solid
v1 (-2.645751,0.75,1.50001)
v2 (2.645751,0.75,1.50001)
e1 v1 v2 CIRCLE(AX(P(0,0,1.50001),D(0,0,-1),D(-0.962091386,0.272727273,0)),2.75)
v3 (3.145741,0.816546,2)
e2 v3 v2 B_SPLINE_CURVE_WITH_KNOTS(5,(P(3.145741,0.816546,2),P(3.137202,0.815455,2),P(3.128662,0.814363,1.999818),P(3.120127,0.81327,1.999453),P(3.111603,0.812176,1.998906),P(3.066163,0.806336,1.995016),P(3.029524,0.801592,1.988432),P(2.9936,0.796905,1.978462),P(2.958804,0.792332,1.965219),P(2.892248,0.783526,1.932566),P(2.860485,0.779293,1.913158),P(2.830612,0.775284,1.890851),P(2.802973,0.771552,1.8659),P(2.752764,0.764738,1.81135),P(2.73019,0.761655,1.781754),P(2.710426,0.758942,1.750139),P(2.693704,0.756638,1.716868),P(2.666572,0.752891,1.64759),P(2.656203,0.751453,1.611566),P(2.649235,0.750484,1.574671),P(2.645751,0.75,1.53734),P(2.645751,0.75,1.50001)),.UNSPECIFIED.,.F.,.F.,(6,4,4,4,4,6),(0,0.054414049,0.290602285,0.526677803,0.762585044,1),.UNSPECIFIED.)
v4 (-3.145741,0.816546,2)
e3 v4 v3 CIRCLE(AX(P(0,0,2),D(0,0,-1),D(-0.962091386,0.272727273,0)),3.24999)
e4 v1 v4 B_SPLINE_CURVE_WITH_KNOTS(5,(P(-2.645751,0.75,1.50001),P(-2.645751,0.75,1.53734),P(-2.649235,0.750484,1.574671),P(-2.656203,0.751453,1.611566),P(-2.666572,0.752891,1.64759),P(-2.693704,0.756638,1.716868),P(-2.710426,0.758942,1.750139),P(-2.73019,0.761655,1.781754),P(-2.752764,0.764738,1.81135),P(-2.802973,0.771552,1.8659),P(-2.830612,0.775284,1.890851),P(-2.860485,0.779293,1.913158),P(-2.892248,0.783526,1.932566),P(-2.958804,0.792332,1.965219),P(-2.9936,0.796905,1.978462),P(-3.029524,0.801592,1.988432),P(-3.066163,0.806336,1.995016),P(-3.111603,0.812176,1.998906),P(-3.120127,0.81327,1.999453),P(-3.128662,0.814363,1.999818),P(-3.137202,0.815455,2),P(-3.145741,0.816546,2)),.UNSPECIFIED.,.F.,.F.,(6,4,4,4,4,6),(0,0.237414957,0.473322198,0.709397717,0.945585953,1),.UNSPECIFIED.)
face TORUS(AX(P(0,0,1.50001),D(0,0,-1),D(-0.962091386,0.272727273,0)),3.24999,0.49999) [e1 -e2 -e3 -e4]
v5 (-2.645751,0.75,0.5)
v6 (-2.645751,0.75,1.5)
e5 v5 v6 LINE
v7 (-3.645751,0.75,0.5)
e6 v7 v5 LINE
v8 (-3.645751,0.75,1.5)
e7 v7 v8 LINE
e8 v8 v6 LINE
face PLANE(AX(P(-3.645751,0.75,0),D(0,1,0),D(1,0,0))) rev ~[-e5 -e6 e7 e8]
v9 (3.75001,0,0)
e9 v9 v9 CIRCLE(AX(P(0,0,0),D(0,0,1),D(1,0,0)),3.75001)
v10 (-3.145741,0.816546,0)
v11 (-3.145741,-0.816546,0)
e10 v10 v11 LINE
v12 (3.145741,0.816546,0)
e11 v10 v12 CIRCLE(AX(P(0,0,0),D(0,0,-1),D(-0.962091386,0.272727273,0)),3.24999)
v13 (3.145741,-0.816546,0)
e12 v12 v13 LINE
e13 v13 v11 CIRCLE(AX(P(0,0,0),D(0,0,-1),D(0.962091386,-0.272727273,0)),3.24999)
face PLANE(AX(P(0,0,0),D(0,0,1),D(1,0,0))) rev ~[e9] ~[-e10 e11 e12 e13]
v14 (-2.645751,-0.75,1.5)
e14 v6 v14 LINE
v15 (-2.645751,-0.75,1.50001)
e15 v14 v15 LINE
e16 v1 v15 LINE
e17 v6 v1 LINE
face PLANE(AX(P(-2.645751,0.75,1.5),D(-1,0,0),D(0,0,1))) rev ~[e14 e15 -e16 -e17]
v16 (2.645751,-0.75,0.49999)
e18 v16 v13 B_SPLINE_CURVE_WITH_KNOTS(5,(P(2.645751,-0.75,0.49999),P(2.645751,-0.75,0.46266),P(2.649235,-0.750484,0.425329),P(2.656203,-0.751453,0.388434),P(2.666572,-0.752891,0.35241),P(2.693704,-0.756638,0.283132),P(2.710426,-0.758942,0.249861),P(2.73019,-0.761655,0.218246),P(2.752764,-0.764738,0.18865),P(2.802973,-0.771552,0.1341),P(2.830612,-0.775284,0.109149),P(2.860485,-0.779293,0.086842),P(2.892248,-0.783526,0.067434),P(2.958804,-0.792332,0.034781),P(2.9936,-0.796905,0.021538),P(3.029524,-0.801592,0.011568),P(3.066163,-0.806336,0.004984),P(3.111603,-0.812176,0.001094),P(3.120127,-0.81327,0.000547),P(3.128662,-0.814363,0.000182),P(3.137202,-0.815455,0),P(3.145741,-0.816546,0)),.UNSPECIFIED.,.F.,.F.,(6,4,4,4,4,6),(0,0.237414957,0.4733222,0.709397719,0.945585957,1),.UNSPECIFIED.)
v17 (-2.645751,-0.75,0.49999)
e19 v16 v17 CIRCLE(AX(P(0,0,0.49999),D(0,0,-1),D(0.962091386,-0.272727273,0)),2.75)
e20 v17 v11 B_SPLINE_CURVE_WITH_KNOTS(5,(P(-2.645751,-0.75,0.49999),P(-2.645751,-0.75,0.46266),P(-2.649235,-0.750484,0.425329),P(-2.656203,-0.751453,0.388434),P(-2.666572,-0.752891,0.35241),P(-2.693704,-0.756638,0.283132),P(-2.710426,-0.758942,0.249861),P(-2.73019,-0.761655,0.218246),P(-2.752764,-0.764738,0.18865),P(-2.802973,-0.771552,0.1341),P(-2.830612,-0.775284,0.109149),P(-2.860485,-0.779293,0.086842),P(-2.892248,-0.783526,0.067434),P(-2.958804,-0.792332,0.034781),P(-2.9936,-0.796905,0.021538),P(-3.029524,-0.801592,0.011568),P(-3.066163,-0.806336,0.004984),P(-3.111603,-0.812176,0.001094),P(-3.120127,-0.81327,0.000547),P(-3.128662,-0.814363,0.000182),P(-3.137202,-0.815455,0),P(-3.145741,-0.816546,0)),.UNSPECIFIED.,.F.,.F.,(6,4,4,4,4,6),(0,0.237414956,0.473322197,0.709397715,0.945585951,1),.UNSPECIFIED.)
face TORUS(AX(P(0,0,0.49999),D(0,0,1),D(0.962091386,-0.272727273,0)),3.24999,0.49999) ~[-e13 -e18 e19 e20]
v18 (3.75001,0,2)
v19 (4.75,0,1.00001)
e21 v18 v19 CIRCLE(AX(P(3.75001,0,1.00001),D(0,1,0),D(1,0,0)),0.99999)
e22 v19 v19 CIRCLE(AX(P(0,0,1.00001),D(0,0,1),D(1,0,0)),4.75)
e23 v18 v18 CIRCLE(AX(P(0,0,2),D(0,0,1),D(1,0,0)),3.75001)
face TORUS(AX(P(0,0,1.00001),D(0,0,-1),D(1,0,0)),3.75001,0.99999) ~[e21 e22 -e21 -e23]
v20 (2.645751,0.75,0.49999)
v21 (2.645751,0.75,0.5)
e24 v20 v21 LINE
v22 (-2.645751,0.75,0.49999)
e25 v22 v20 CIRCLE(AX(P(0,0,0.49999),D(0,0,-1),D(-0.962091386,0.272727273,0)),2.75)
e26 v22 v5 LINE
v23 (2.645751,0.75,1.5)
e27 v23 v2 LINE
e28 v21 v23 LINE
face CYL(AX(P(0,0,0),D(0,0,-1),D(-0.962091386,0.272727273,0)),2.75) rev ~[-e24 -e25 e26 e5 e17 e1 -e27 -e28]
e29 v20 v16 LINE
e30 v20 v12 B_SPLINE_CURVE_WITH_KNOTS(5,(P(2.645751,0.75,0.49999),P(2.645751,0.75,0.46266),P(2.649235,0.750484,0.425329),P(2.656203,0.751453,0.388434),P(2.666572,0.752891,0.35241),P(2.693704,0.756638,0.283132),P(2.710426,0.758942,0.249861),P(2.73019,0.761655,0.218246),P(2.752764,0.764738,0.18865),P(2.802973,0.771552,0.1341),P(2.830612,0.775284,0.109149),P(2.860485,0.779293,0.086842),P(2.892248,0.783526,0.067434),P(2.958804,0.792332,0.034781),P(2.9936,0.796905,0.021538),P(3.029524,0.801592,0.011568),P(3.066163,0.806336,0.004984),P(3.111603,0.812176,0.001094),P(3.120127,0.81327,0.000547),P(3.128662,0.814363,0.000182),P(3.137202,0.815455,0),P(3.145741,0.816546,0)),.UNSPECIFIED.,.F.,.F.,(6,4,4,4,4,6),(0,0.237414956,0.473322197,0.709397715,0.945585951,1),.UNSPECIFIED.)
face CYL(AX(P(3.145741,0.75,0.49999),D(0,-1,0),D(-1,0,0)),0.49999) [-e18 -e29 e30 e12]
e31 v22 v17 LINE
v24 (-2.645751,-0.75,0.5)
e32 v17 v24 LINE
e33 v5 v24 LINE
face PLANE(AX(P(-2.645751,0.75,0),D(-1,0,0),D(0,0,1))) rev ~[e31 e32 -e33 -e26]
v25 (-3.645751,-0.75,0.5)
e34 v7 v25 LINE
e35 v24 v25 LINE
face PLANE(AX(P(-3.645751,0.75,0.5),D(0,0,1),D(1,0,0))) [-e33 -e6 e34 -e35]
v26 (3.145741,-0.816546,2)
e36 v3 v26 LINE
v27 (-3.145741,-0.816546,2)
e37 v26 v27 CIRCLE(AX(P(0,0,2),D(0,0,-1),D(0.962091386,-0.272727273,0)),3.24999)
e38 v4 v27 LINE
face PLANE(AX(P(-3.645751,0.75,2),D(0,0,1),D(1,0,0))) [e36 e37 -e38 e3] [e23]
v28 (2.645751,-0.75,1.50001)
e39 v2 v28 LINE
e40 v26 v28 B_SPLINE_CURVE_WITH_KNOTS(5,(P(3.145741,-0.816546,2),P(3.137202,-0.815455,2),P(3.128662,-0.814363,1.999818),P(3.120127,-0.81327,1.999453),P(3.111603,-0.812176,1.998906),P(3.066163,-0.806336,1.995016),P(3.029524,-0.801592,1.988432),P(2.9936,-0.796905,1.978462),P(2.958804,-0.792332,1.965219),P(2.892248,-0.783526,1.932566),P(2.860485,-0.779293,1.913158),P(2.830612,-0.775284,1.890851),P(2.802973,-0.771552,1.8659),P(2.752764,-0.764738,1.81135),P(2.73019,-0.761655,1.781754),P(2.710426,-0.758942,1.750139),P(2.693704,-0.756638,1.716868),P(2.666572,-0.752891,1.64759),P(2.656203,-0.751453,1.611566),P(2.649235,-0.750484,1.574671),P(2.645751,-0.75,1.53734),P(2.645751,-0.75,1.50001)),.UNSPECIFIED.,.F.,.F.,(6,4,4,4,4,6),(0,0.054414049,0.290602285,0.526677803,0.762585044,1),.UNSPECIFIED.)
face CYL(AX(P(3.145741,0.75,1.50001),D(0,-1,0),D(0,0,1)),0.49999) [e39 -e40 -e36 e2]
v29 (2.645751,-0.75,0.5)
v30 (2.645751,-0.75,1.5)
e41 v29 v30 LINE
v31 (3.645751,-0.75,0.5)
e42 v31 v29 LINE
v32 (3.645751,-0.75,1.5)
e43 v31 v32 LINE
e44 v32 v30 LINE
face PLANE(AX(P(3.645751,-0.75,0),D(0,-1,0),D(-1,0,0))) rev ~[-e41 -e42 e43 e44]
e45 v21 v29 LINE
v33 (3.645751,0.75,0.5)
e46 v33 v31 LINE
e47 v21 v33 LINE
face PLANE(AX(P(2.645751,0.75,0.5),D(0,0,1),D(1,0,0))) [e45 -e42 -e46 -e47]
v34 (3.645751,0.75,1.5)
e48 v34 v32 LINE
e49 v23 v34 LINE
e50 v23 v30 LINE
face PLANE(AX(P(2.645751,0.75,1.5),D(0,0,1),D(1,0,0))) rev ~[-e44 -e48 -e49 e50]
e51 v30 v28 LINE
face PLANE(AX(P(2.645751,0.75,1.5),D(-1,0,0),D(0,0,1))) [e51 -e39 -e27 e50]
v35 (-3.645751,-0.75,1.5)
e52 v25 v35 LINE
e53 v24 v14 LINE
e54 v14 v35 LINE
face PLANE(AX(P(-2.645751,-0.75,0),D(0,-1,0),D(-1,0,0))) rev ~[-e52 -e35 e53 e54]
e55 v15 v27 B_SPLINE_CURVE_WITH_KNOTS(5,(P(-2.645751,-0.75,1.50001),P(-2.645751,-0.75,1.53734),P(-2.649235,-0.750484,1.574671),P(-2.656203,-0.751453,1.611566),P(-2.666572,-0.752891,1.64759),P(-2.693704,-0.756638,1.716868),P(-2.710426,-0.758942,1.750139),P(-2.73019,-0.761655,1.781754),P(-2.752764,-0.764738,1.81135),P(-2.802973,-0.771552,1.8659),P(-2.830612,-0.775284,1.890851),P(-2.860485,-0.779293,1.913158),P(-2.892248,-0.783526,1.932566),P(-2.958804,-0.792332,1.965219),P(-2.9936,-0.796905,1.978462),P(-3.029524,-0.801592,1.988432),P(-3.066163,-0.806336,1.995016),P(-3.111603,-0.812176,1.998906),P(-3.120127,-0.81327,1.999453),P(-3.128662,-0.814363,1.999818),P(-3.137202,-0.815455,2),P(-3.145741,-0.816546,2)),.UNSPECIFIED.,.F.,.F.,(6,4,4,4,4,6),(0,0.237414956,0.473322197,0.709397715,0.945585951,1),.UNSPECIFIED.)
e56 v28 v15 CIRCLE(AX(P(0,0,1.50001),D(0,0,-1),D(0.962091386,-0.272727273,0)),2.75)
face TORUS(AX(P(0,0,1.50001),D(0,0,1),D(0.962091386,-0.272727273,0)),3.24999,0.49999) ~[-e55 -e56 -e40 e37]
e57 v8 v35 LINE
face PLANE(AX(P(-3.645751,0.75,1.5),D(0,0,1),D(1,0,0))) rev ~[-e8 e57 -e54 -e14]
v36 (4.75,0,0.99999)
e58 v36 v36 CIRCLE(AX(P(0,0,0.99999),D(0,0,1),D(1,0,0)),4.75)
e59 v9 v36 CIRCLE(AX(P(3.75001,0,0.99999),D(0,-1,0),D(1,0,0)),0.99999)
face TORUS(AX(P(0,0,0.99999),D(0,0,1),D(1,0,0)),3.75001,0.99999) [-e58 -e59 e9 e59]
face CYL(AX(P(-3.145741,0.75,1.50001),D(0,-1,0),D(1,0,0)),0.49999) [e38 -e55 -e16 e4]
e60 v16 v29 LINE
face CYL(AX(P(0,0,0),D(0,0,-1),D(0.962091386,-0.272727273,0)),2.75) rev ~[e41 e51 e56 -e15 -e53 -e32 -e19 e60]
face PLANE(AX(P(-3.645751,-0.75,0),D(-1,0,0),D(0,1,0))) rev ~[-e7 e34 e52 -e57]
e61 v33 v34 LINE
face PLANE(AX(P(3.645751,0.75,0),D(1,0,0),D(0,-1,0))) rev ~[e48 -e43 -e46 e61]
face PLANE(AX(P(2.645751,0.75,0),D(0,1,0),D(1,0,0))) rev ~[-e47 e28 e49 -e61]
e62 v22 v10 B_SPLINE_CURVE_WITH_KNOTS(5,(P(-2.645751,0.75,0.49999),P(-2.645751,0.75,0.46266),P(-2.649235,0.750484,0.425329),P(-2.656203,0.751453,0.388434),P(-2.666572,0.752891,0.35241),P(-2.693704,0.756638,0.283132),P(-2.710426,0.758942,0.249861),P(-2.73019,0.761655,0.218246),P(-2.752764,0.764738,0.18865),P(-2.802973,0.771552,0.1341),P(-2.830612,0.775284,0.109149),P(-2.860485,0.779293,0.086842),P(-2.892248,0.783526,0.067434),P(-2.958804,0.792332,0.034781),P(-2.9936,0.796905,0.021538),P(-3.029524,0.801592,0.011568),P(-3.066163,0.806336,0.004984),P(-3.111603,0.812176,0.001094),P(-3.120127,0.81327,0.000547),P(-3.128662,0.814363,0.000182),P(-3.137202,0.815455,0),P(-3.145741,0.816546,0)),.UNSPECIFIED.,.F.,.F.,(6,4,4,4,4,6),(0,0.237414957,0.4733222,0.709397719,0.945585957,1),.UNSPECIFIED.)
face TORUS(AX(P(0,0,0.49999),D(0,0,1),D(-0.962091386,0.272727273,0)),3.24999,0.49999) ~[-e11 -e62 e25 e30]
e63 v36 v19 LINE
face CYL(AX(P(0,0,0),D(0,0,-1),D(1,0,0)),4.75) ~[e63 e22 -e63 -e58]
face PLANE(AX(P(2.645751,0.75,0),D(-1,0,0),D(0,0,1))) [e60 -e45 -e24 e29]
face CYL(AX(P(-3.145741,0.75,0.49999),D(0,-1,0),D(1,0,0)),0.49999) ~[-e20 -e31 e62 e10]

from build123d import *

# Parameters (mm, degrees)
F0_R     = 4.75
F1_DEPTH = 2
F2_W     = 1
F2_H     = 0.5
F3_W     = 1
F3_H     = 0.5
F4_DEPTH = 2.5
F5_R     = 0.49999
F6_R     = 0.99999


# Not quite as in the source:
# - a fillet or chamfer is up to 0.001 mm smaller than in the source, because OpenCascade refuses the exact size


with BuildPart() as f1:
    # F0 (on Top) → F1 (new body)
    with BuildSketch(Plane.XY):
        Circle(F0_R)
        with BuildLine():
            ThreePointArc((-2.6457513111, 0.75), (0, 2.75), (2.6457513111, 0.75))
            Line((2.6457513111, 0.75), (3.6457513111, 0.75))
            Line((3.6457513111, 0.75), (3.6457513111, -0.75))
            Line((3.6457513111, -0.75), (2.6457513111, -0.75))
            ThreePointArc((2.6457513111, -0.75), (0, -2.75), (-2.6457513111, -0.75))
            Line((-2.6457513111, -0.75), (-3.6457513111, -0.75))
            Line((-3.6457513111, -0.75), (-3.6457513111, 0.75))
            Line((-3.6457513111, 0.75), (-2.6457513111, 0.75))
        make_face(mode=Mode.SUBTRACT)
    extrude(amount=F1_DEPTH)

    # F2 (on face) + F3 (on face) → F4 (join)
    with BuildSketch(Plane.XZ.offset(-0.75)):
        with Locations((-3.1457513111, 1.75)):
            Rectangle(F2_W, F2_H)
        with Locations((-3.1457513111, 0.25)):
            Rectangle(F2_W, F2_H)
    with BuildSketch(Plane.XZ.offset(-0.75)):
        with Locations((3.1457513111, 0.25)):
            Rectangle(F3_W, F3_H)
        with Locations((3.1457513111, 1.75)):
            Rectangle(F3_W, F3_H)
    extrude(amount=F4_DEPTH)

    # F5 (radius 0.5 in the source; OpenCascade refuses exactly that, so slightly less here)
    f5_edges = [f1.edges().sort_by_distance(p)[0] for p in [
        (-2.645751, 0, 2),
        (2.645751, 0, 2),
        (0, 2.75, 2),
        (0, -2.75, 2),
        (0, 2.75, 0),
        (0, -2.75, 0),
        (-2.645751, 0, 0),
        (2.645751, 0, 0),
    ]]
    fillet(f5_edges, radius=F5_R)

    # F6 (radius 1 in the source; OpenCascade refuses exactly that, so slightly less here)
    f6_edges = [f1.edges().sort_by_distance(p)[0] for p in [
        (-4.75, 0, 2),
        (-4.75, 0, 0),
    ]]
    fillet(f6_edges, radius=F6_R)


solid = f1.part
